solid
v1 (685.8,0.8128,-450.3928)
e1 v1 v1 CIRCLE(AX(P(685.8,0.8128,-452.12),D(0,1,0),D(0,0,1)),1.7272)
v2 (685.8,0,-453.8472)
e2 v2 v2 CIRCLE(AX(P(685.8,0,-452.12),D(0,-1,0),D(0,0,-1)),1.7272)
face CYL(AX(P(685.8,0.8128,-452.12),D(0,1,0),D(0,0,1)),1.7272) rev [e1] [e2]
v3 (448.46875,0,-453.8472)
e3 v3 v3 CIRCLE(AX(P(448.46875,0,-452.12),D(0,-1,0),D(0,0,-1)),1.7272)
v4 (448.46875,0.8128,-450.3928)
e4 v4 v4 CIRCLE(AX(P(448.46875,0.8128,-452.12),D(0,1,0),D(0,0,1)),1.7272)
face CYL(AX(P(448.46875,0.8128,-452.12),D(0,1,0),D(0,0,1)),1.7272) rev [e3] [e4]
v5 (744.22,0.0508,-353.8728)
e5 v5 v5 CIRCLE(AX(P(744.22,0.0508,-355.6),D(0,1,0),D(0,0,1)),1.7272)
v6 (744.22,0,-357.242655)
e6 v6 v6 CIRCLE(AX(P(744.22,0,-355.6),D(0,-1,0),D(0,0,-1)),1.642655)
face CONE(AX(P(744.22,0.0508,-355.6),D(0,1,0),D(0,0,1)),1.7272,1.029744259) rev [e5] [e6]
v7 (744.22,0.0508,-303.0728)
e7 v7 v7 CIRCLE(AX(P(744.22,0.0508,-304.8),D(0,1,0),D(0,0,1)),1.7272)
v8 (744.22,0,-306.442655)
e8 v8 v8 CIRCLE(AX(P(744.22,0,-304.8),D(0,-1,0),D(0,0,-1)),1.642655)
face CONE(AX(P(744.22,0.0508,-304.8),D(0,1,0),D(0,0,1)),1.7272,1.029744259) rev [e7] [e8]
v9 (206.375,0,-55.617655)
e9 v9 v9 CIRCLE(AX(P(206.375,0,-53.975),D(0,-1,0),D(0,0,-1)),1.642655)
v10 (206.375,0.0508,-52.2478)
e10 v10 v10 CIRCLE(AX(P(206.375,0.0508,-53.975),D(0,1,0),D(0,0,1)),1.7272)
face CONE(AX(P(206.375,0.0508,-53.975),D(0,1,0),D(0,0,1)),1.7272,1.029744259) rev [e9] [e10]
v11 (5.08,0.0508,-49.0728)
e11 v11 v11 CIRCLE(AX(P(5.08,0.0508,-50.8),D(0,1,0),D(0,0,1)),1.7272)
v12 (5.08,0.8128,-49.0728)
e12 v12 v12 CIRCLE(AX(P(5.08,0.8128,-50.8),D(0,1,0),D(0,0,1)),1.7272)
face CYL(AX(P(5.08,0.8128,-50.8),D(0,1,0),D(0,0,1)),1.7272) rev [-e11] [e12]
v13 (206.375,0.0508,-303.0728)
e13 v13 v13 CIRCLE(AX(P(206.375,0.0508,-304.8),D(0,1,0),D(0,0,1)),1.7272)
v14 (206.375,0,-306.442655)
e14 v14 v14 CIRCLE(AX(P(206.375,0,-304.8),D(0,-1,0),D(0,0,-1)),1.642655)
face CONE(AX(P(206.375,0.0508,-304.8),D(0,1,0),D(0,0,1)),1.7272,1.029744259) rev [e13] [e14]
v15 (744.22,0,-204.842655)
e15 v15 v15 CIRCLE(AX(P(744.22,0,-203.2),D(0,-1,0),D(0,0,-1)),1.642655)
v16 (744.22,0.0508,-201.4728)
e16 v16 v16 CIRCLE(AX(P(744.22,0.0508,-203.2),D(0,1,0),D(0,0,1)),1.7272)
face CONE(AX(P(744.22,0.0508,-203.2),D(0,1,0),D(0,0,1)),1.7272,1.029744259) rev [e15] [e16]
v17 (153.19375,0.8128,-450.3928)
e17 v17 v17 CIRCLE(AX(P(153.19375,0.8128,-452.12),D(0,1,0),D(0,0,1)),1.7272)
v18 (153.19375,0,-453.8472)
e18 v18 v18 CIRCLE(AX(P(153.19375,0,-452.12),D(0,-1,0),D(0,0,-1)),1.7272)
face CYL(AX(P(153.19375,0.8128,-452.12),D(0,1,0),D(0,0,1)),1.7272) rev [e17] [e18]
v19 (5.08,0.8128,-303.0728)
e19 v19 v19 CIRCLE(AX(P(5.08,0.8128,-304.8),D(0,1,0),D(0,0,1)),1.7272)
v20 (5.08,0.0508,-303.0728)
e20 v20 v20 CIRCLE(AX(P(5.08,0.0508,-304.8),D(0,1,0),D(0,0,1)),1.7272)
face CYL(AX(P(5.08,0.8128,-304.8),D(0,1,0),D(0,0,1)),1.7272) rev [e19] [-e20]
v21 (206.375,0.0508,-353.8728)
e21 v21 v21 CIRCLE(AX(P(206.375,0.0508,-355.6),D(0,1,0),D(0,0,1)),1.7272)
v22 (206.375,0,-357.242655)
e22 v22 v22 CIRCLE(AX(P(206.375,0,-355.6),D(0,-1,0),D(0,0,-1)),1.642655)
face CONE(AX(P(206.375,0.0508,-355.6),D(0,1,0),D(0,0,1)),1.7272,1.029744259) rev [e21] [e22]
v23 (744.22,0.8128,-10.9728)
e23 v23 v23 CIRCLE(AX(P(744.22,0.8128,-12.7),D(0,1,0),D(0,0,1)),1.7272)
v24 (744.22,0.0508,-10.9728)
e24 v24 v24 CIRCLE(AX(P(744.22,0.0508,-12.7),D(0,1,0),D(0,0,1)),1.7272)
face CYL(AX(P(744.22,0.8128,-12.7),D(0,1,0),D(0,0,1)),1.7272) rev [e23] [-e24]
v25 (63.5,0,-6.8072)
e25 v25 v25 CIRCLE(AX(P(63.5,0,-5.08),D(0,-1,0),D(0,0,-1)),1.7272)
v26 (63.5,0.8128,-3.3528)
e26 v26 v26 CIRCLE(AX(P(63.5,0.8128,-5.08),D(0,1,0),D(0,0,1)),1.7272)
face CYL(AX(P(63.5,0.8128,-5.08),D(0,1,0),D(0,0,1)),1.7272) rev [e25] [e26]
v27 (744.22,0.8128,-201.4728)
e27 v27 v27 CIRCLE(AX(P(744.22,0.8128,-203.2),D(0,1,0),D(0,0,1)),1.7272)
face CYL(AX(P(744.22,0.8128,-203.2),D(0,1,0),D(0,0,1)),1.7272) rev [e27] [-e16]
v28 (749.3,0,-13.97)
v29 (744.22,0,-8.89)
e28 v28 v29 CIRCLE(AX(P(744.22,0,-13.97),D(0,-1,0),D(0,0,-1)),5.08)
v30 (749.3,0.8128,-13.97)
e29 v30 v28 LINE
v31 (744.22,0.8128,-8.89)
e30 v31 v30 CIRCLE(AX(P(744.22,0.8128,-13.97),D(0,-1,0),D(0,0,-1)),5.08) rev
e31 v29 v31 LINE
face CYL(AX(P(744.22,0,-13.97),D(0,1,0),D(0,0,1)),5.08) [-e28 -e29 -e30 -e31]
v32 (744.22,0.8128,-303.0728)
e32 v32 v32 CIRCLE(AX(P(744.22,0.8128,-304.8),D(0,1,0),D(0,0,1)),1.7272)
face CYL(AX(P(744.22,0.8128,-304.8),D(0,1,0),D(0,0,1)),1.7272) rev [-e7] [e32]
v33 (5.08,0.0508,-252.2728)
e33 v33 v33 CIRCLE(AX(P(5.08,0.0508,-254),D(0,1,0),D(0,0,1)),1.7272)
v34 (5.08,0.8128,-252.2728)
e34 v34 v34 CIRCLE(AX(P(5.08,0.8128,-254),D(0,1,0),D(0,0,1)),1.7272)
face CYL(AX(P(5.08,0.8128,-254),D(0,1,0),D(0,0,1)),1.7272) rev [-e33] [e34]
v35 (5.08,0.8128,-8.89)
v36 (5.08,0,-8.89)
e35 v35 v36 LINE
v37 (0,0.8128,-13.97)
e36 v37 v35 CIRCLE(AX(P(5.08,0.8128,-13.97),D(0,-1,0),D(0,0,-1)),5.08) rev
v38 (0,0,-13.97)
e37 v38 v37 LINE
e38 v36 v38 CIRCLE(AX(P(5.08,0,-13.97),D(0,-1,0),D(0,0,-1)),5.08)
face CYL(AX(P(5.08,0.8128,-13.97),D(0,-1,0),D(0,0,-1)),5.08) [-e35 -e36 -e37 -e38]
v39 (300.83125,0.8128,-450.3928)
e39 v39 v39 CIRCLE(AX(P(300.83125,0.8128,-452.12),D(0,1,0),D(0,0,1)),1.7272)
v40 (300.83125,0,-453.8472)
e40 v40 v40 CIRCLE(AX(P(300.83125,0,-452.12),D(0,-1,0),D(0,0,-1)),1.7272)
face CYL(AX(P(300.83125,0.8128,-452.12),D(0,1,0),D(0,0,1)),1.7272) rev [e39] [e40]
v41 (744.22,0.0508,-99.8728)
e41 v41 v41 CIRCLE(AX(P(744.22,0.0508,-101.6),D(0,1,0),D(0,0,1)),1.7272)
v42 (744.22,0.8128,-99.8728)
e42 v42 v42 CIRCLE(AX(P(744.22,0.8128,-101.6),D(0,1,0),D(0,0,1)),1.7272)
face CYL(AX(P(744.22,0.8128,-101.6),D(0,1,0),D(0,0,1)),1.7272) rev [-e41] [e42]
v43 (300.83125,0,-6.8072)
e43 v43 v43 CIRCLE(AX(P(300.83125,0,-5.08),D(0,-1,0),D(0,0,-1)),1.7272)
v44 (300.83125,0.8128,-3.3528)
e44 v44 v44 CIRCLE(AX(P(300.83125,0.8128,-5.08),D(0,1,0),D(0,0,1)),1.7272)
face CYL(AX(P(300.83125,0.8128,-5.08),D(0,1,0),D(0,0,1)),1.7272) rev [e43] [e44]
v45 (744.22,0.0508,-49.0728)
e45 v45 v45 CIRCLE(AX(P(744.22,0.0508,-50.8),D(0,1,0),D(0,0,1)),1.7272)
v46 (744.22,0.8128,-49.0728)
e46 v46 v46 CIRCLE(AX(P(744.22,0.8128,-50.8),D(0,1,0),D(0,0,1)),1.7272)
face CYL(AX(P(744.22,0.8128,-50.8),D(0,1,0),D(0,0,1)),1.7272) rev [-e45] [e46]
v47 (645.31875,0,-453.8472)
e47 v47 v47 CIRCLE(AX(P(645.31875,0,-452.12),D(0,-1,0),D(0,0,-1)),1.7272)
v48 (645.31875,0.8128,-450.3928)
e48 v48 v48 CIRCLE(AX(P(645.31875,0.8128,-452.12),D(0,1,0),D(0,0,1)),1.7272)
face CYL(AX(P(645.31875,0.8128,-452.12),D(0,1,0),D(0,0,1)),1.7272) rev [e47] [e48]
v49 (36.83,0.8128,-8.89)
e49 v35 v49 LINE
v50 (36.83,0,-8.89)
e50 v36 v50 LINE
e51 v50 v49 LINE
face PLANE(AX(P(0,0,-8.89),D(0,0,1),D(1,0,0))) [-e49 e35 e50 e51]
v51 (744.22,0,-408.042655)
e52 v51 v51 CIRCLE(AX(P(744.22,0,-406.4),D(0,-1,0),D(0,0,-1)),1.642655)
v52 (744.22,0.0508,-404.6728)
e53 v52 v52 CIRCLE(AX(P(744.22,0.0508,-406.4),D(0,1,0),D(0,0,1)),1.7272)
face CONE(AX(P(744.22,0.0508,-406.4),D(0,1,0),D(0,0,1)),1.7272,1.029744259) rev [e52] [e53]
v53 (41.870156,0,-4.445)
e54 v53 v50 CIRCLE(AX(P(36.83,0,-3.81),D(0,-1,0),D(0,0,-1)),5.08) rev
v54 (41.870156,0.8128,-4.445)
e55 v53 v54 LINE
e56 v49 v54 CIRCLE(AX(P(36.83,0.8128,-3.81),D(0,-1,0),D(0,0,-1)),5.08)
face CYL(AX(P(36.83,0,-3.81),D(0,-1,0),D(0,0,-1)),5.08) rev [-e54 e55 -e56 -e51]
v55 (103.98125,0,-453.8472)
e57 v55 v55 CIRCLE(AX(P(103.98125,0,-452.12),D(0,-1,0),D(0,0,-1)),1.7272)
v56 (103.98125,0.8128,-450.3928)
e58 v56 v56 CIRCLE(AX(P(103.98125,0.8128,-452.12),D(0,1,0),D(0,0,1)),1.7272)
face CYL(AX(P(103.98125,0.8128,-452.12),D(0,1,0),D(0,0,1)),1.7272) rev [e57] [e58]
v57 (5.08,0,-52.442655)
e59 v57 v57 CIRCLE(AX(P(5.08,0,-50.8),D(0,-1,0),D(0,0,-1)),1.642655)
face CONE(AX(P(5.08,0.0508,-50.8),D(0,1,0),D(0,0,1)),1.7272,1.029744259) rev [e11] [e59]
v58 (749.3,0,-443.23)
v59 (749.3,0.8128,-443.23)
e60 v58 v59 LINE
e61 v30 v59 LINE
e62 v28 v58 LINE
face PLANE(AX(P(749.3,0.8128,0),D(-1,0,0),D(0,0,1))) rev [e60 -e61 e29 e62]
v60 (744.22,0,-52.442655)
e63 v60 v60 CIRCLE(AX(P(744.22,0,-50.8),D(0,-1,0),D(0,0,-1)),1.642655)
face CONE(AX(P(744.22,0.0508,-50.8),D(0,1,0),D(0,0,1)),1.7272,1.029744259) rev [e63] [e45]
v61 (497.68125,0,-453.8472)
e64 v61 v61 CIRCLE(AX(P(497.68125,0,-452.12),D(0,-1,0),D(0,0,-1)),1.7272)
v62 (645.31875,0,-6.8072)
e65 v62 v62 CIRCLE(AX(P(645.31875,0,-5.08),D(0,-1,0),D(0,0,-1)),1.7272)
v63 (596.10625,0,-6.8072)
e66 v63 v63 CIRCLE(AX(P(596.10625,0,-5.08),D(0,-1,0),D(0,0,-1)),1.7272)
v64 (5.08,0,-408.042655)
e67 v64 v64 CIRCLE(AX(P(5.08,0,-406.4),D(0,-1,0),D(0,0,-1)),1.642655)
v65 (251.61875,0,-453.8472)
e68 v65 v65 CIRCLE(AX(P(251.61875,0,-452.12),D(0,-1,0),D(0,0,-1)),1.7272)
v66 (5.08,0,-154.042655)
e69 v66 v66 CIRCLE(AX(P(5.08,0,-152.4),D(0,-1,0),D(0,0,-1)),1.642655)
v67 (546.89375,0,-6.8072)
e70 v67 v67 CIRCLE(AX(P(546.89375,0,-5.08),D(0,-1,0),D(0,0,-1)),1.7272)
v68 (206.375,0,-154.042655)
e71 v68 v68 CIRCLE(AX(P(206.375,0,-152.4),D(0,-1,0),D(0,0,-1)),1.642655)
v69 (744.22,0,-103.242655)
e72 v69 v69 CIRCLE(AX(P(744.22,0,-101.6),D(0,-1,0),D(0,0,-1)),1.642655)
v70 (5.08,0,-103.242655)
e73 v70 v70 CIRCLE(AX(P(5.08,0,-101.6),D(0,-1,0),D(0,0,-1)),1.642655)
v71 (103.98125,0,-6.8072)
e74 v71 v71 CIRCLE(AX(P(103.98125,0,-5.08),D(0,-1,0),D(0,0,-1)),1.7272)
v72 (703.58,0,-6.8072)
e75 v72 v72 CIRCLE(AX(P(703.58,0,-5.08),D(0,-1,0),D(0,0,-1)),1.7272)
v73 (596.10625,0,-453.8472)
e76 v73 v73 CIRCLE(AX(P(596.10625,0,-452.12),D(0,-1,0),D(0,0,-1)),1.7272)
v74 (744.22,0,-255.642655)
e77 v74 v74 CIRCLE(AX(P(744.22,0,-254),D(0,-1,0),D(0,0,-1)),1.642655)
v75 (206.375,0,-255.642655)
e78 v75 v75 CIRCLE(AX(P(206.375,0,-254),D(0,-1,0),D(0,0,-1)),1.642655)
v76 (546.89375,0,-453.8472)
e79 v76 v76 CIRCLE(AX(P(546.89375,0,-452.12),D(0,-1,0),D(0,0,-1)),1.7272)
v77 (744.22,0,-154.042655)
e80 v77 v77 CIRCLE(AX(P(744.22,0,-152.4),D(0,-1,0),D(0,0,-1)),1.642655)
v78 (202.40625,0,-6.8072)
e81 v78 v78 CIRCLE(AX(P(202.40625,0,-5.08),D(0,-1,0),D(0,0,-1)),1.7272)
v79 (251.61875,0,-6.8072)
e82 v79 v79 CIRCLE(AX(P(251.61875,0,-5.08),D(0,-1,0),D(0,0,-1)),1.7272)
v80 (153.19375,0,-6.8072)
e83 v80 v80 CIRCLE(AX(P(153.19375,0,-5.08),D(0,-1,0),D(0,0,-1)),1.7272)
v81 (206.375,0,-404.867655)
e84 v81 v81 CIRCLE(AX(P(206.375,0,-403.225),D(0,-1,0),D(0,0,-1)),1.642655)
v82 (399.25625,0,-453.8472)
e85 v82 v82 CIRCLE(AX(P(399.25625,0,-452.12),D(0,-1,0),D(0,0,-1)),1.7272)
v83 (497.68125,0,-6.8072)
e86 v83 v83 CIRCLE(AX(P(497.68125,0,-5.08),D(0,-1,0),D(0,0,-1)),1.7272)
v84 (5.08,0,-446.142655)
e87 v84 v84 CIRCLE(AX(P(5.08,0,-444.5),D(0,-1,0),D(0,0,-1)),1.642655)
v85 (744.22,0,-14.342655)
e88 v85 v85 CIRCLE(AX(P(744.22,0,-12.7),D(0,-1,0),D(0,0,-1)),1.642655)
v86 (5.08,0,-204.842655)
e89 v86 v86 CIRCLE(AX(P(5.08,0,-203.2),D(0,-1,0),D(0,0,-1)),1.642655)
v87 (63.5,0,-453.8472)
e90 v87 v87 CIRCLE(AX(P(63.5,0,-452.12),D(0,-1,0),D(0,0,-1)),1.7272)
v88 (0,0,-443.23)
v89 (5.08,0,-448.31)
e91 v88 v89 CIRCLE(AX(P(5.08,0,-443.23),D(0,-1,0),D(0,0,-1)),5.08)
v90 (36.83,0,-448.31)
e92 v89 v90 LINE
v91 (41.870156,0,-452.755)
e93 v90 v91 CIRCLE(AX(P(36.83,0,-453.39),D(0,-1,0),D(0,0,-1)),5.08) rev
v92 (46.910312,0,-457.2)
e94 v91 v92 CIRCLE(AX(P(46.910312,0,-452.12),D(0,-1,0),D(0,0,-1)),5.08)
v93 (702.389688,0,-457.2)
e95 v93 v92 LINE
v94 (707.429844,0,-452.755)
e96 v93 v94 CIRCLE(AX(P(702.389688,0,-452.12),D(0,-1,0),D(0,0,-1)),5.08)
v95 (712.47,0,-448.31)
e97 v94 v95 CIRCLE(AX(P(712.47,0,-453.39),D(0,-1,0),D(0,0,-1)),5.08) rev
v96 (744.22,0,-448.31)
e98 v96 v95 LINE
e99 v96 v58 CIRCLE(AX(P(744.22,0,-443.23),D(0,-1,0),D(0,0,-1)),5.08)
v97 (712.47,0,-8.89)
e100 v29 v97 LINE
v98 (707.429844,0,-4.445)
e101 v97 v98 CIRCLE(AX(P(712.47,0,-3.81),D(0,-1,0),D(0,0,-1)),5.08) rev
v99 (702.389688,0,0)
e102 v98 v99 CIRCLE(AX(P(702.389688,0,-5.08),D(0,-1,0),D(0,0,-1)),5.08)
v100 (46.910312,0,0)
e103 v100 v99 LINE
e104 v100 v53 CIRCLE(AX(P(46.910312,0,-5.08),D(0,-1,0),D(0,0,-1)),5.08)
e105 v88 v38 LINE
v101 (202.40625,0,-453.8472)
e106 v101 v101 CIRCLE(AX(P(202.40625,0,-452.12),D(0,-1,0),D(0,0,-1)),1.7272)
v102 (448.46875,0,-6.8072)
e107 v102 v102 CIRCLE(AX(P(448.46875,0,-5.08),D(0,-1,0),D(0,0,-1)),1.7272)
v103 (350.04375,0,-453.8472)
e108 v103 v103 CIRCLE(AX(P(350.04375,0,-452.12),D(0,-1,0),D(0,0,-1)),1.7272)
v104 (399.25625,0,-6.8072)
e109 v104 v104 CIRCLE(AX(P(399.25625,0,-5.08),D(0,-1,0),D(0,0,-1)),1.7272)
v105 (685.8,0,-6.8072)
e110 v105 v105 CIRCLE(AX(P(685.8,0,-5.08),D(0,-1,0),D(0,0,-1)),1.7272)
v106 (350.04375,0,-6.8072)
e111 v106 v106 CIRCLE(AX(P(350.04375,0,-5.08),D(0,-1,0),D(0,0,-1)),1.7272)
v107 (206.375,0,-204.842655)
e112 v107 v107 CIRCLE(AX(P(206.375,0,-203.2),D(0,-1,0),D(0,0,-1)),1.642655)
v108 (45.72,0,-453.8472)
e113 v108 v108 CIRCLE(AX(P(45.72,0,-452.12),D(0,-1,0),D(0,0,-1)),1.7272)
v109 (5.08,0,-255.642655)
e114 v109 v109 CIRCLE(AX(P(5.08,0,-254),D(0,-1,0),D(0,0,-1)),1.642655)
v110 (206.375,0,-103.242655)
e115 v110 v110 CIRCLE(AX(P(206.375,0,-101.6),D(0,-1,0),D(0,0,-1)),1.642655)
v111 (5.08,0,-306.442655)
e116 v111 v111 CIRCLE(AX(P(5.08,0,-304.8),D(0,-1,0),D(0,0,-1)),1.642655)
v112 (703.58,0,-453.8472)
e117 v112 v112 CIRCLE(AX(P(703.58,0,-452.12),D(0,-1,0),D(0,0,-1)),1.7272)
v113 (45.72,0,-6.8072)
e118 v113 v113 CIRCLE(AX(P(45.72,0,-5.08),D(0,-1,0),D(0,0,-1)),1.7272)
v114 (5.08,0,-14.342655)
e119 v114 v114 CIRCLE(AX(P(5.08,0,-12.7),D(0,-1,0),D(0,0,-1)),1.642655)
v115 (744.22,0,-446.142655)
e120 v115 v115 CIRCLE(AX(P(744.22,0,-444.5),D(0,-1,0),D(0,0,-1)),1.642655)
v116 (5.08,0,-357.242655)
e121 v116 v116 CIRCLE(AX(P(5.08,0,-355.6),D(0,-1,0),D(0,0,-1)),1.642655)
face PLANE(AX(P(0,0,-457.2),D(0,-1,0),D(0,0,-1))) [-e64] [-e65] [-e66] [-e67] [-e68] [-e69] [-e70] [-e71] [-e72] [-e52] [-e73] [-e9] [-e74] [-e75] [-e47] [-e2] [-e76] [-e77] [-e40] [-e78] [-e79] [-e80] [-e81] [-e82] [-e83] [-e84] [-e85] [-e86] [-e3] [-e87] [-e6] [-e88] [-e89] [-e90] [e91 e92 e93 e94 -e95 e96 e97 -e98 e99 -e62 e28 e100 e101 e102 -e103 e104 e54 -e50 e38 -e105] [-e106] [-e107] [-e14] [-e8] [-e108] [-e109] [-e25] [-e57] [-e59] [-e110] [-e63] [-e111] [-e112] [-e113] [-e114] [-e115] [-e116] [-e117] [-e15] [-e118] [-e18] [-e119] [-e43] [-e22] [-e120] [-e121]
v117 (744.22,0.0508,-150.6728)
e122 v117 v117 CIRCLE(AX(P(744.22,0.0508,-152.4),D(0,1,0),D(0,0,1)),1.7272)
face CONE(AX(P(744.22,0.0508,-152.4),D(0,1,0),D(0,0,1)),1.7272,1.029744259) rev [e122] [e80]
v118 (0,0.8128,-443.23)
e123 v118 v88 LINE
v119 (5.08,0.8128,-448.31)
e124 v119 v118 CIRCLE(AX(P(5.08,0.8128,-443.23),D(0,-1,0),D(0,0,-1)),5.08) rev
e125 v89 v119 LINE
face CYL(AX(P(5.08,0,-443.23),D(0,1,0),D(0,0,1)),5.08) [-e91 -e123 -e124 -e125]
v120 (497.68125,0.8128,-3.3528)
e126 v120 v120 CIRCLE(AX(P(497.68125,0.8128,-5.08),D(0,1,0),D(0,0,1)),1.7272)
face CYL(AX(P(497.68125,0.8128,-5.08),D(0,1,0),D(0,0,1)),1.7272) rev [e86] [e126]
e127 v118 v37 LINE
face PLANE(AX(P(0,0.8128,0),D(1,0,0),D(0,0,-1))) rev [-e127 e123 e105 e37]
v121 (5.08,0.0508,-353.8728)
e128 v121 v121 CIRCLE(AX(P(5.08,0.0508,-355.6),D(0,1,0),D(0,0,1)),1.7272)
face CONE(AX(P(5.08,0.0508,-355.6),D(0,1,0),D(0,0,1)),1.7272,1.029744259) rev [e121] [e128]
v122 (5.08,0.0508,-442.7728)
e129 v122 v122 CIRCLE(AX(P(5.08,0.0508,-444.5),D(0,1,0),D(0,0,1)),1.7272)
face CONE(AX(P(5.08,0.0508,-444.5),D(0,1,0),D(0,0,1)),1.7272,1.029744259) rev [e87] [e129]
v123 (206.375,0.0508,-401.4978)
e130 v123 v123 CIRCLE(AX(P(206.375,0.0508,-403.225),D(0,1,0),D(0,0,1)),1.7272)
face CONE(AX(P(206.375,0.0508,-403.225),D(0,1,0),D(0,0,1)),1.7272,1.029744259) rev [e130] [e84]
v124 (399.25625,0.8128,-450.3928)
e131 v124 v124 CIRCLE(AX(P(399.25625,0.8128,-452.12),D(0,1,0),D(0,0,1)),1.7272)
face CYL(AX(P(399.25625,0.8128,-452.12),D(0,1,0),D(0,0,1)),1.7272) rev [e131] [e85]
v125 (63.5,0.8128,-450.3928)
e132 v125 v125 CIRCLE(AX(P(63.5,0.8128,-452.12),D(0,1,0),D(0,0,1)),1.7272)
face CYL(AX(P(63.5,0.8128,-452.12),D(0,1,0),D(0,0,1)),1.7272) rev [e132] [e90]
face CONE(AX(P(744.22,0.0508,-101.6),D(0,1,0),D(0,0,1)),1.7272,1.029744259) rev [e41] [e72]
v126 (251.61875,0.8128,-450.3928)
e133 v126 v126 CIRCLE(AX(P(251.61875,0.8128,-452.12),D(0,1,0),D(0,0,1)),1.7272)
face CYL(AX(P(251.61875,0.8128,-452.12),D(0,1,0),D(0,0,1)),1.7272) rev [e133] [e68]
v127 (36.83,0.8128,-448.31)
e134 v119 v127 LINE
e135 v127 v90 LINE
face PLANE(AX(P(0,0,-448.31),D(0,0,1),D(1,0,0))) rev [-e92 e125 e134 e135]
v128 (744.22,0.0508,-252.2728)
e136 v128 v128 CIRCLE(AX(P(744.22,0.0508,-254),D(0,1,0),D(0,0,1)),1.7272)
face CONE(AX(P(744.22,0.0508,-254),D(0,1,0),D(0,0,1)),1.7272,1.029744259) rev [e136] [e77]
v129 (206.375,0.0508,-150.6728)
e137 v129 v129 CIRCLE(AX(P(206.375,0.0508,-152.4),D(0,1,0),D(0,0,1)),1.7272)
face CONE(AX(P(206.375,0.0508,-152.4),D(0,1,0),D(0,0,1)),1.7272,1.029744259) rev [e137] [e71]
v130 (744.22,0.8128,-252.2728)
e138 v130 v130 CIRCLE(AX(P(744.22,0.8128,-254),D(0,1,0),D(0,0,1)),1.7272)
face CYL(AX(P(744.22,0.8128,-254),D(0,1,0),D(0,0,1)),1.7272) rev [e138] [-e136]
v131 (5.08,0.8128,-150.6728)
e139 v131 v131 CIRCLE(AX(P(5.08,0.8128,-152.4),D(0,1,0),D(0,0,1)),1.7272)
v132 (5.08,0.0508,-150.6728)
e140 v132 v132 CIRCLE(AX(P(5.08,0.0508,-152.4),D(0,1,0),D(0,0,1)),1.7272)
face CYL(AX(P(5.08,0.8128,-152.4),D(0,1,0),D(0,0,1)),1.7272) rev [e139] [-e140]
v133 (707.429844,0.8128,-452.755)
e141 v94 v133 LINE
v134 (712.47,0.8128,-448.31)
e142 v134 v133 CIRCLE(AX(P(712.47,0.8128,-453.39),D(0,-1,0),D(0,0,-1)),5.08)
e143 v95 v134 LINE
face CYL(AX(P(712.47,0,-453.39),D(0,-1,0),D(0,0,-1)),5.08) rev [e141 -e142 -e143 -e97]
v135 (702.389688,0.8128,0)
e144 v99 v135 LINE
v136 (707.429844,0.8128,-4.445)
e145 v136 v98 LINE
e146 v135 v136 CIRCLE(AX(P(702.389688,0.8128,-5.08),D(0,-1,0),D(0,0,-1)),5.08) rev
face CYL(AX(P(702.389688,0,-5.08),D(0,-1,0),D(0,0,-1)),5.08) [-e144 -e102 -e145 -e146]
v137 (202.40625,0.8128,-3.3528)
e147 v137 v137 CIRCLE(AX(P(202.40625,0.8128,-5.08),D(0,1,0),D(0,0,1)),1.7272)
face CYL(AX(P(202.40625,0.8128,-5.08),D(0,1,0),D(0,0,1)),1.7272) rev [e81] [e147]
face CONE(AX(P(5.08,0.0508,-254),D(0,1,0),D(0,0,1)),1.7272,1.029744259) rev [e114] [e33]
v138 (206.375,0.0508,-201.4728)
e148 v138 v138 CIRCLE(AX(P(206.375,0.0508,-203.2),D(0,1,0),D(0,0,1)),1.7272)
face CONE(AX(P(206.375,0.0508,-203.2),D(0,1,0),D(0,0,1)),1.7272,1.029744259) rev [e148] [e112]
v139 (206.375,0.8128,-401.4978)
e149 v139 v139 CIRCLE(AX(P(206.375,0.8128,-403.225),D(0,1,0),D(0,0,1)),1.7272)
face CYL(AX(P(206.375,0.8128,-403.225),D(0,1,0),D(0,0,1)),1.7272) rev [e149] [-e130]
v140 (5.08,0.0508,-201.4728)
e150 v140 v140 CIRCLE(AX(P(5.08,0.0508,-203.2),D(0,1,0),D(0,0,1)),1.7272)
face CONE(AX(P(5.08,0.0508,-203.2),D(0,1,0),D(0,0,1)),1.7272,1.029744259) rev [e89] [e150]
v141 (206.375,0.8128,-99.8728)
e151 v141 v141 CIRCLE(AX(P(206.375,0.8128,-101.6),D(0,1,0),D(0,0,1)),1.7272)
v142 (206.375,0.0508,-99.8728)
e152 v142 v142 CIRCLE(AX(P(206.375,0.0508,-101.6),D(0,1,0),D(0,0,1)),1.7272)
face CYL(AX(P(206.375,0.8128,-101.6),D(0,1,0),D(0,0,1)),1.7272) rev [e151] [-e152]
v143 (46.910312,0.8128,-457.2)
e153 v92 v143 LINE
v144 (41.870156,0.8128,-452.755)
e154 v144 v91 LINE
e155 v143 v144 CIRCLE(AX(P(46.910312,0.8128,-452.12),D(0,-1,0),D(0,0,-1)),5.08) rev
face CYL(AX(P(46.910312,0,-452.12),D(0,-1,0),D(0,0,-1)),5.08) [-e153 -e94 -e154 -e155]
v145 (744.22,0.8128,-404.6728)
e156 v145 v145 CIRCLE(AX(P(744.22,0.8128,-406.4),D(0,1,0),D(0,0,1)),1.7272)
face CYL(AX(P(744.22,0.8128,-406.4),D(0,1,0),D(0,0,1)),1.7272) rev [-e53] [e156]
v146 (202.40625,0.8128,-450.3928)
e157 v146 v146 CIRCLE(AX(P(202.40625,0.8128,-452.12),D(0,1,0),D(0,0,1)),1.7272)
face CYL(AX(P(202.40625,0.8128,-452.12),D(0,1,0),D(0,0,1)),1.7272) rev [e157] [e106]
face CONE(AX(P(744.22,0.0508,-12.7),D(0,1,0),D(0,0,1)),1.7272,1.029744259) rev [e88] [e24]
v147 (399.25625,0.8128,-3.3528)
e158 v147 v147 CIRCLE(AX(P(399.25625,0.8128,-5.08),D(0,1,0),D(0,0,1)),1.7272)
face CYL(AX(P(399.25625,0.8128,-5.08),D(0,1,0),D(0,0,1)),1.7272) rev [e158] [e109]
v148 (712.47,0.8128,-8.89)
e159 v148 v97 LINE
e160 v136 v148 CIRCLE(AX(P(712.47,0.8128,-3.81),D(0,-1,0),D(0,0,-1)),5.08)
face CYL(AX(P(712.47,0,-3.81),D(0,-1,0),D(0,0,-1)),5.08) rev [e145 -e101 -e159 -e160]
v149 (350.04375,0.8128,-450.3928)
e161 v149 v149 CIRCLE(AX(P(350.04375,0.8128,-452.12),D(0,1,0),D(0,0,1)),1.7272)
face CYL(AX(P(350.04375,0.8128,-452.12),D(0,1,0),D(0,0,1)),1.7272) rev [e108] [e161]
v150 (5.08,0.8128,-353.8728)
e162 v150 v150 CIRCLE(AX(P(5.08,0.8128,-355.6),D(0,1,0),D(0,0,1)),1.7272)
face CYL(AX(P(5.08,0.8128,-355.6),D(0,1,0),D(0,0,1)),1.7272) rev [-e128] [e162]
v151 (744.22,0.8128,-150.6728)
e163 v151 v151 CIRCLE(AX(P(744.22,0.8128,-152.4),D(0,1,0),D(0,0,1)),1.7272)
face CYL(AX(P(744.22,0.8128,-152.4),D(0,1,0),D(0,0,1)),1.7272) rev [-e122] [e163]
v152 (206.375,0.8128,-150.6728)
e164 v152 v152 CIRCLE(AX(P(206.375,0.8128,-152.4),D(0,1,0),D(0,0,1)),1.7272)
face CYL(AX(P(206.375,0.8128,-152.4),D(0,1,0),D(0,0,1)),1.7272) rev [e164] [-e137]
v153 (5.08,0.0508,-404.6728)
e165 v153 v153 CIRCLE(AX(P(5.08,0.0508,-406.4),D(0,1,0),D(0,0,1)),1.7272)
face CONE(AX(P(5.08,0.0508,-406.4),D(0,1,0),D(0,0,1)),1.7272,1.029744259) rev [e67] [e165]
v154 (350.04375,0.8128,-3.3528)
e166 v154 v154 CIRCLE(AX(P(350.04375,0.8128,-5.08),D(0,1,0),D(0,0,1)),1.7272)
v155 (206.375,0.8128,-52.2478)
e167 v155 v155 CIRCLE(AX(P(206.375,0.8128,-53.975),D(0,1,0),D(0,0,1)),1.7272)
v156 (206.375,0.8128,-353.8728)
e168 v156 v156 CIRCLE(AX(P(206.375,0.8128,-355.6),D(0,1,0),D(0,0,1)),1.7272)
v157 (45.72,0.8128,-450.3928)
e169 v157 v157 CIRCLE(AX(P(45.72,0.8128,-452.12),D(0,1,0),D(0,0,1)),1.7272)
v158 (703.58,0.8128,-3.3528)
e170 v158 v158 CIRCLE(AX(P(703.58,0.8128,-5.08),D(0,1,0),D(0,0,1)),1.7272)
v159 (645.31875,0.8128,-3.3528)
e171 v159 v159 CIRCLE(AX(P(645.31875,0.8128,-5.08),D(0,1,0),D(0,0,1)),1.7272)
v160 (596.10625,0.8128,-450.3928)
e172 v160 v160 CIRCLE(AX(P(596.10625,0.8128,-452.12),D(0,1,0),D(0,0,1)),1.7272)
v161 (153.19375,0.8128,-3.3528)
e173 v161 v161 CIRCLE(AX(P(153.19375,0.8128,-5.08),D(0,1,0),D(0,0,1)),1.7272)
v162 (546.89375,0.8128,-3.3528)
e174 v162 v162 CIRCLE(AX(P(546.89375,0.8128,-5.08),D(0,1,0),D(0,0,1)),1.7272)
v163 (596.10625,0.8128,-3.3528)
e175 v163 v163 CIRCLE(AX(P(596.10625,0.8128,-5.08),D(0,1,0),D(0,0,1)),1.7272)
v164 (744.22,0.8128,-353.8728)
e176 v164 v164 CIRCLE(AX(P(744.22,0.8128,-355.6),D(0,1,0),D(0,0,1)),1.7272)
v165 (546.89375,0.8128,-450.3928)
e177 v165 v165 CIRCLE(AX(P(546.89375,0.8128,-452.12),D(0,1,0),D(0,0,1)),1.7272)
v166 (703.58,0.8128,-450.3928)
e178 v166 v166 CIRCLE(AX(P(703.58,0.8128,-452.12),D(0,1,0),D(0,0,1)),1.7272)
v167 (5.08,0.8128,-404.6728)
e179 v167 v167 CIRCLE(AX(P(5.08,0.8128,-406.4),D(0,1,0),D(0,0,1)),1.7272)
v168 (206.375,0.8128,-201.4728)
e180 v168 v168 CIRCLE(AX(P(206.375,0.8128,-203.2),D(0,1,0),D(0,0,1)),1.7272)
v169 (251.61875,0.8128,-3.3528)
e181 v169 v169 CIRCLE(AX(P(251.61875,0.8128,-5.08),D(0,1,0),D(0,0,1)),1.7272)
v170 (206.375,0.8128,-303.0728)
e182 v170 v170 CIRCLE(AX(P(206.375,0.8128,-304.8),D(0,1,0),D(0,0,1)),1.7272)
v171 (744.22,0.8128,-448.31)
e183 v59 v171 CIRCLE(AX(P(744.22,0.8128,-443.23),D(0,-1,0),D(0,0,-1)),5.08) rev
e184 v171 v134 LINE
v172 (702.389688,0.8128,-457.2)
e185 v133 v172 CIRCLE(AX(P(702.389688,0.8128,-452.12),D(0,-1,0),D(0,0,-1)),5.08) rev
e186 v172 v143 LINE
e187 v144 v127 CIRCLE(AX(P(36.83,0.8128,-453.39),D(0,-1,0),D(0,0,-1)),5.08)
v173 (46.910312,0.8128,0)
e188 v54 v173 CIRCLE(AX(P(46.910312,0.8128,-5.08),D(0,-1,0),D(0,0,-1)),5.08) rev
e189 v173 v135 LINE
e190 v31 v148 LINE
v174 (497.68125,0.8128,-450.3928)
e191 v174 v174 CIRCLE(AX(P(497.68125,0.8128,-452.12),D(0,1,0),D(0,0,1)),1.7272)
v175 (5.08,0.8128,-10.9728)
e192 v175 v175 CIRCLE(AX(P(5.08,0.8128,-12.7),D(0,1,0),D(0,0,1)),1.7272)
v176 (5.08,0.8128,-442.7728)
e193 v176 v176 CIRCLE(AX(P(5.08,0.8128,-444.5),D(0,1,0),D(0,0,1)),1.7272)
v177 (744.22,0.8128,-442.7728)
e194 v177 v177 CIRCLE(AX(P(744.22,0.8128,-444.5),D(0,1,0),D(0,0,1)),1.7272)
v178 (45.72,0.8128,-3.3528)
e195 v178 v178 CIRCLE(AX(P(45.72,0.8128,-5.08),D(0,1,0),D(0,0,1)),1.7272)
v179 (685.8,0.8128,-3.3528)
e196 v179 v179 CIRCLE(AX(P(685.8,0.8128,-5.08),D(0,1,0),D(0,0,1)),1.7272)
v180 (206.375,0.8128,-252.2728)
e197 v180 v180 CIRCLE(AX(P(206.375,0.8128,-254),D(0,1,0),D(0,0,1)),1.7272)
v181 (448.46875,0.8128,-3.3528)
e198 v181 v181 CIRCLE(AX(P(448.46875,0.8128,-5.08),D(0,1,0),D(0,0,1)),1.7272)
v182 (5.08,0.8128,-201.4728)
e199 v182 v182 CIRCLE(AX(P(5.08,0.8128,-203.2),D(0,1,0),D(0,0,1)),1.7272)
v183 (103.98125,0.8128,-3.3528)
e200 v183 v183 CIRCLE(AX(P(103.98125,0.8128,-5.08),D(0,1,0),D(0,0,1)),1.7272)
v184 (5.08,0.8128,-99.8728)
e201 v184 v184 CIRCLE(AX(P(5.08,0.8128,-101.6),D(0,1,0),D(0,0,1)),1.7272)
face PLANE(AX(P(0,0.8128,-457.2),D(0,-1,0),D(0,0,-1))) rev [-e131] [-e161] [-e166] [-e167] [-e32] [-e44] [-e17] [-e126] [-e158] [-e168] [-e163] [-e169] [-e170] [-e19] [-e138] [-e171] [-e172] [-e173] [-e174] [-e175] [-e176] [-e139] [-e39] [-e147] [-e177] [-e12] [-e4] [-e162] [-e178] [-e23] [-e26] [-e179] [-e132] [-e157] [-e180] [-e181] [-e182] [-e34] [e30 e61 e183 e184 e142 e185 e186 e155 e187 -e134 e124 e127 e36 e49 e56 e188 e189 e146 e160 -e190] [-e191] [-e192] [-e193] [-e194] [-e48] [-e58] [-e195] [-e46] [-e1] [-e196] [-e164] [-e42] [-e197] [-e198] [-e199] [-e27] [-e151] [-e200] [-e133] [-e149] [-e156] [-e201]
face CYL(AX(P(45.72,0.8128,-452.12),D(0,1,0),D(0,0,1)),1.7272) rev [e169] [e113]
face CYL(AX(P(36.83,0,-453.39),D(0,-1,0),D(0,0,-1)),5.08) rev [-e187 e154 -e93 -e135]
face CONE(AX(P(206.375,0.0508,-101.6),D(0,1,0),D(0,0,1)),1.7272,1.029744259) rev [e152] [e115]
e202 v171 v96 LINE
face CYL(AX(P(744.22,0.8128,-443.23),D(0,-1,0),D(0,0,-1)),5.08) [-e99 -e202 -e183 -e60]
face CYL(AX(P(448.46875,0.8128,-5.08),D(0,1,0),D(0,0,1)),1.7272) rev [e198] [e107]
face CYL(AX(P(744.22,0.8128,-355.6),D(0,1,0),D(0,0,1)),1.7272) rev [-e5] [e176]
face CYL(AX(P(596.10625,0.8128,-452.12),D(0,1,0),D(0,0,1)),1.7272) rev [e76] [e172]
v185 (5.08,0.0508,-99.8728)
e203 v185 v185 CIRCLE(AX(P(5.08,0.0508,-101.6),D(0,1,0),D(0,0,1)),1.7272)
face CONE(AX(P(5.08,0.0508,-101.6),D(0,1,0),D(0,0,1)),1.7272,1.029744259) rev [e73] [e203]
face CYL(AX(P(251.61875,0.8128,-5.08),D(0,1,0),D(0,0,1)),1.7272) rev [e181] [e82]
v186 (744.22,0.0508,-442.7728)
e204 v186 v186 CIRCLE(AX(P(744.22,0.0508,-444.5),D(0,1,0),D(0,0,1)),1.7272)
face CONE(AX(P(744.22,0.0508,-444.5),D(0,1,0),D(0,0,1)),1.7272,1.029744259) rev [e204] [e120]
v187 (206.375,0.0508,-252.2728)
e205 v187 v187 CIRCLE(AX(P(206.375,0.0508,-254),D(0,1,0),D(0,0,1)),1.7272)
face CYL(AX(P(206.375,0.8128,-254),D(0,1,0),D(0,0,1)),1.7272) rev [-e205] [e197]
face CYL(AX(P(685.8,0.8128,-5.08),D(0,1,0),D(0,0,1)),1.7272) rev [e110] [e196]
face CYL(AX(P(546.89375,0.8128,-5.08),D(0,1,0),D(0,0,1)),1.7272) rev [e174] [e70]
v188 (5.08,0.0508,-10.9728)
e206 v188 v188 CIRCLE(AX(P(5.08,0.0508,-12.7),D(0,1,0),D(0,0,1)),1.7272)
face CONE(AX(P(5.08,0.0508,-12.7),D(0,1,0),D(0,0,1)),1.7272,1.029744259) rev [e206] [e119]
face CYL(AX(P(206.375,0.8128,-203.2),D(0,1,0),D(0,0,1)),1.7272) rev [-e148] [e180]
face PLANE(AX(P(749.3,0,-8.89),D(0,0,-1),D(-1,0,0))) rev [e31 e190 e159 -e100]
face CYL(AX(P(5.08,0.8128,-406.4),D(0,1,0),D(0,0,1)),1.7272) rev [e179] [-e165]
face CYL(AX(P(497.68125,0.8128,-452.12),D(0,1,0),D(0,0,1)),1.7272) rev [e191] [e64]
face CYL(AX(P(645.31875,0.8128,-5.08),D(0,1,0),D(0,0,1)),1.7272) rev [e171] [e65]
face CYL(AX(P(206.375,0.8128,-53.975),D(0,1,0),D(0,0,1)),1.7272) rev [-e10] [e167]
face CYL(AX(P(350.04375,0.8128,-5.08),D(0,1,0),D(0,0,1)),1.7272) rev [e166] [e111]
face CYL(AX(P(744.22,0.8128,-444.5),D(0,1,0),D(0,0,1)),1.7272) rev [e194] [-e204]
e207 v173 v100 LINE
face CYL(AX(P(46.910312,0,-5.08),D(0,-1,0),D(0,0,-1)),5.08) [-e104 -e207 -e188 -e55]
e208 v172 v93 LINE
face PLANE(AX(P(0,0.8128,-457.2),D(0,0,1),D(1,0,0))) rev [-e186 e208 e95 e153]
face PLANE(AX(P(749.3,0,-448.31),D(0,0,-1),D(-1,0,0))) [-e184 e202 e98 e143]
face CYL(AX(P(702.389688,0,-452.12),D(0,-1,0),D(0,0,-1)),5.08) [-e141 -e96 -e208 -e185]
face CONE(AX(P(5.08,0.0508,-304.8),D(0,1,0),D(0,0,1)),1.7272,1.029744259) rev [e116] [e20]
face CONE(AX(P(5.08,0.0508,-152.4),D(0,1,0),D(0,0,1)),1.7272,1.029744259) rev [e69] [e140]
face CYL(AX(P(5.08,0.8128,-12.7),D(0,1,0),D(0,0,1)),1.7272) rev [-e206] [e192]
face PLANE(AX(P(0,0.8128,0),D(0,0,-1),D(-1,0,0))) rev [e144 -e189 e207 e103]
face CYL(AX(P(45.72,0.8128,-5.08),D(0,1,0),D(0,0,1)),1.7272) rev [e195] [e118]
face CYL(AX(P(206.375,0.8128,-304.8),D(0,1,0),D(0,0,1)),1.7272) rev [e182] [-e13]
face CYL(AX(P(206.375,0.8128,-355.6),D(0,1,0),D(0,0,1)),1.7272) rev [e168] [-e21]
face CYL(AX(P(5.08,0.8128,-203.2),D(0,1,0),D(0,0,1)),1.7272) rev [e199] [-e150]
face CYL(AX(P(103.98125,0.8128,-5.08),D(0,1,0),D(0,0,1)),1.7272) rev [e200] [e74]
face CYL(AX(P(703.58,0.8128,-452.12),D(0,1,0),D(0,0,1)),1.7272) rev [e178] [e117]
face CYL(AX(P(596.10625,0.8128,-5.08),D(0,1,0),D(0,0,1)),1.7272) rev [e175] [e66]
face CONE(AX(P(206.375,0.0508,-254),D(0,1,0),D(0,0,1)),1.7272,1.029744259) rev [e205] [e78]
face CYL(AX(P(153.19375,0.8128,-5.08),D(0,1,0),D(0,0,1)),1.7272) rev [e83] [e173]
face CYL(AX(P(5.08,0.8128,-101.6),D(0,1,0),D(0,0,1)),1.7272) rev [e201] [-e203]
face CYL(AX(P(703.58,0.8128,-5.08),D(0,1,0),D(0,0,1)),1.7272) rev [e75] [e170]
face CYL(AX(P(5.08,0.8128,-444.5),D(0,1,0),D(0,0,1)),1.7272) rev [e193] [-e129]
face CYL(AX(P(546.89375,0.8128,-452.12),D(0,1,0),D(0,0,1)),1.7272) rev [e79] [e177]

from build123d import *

# Parameters (mm, degrees)
SKETCH1_W                       = 749.3
SKETCH1_H                       = 457.2
BOSS_EXTRUDE1_DEPTH             = 0.8128
SKETCH2_W                       = 41.91
SKETCH2_H                       = 8.89
CUT_EXTRUDE1_DEPTH              = 878.771605057
FILLET1_R                       = 5.08
FILLET1_OF_MIRROR1_R            = 5.08
MIRROR2_DEPTH                   = 0.8128
F_4_CLEARANCE_HOLE1_D           = 3.4544
F_4_CLEARANCE_HOLE2_AT_2_COUNT  = 2
F_4_CLEARANCE_HOLE2_AT_2_PITCH  = 38.1
F_4_CLEARANCE_HOLE2_AT_3_COUNT  = 2
F_4_CLEARANCE_HOLE2_AT_3_PITCH  = 88.9
F_4_CLEARANCE_HOLE2_AT_4_COUNT  = 2
F_4_CLEARANCE_HOLE2_AT_4_PITCH  = 139.7
F_4_CLEARANCE_HOLE2_AT_5_COUNT  = 2
F_4_CLEARANCE_HOLE2_AT_5_PITCH  = 190.5
F_4_CLEARANCE_HOLE2_AT_6_COUNT  = 2
F_4_CLEARANCE_HOLE2_AT_6_PITCH  = 241.3
F_4_CLEARANCE_HOLE2_AT_7_COUNT  = 2
F_4_CLEARANCE_HOLE2_AT_7_PITCH  = 292.1
F_4_CLEARANCE_HOLE2_AT_8_COUNT  = 2
F_4_CLEARANCE_HOLE2_AT_8_PITCH  = 342.9
F_4_CLEARANCE_HOLE2_AT_9_COUNT  = 2
F_4_CLEARANCE_HOLE2_AT_9_PITCH  = 393.7
F_4_CLEARANCE_HOLE2_AT_10_COUNT = 2
F_4_CLEARANCE_HOLE2_AT_10_PITCH = 431.8
F_4_CLEARANCE_HOLE3_D           = 3.4544
F_4_CLEARANCE_HOLE3_DEPTH       = 0.762
F_4_CLEARANCE_HOLE3_TIP         = 1.037806461
FILLET2_R                       = 5.08


# Read off the part's stored shape, not the designer's step: Mirror2
with BuildPart() as part:
    # Sketch1 → Boss-Extrude1 (new body)
    with BuildSketch(Plane(origin=(0, 0, 0), x_dir=(1, 0, 0), z_dir=(0, 1, 0))):
        with Locations((374.65, 228.6)):
            Rectangle(SKETCH1_W, SKETCH1_H)
    extrude(amount=BOSS_EXTRUDE1_DEPTH)

    # Sketch2 → Cut-Extrude1 (cut, through all)
    with BuildSketch(Plane(origin=(0, 0.8128, 0), x_dir=(1, 0, 0), z_dir=(0, 1, 0))):
        with Locations((20.955, 452.755)):
            Rectangle(SKETCH2_W, SKETCH2_H)
    cut_extrude1 = extrude(amount=-CUT_EXTRUDE1_DEPTH, mode=Mode.SUBTRACT)

    # Fillet1
    fillet1_edges = [part.edges().sort_by_distance(p)[0] for p in [
        (41.91, 0.4064, -448.31),
    ]]
    fillet(fillet1_edges, radius=FILLET1_R)

    # Mirror1: Cut-Extrude1 across plane
    add(cut_extrude1.mirror(Plane.ZY.offset(-374.65)), mode=Mode.SUBTRACT)

    # Fillet1 of Mirror1
    fillet1_of_mirror1_edges = [part.edges().sort_by_distance(p)[0] for p in [
        (707.39, 0.4064, -448.31),
    ]]
    fillet(fillet1_of_mirror1_edges, radius=FILLET1_OF_MIRROR1_R)

    # Mirror2 outline → Mirror2 (cut)
    with BuildSketch(Plane(origin=(0, 0, 0), x_dir=(1, 0, 0), z_dir=(0, 1, 0))):
        with BuildLine():
            Line((707.39, 3.81), (707.39, 0))
            Line((707.39, 0), (749.3, 0))
            Line((749.3, 0), (749.3, 8.89))
            Line((749.3, 8.89), (712.47, 8.89))
            ThreePointArc((712.47, 8.89), (708.877897552, 7.402102448), (707.39, 3.81))
        make_face()
        with BuildLine():
            Line((41.91, 0), (41.91, 3.81))
            ThreePointArc((41.91, 3.81), (40.422102448, 7.402102448), (36.83, 8.89))
            Line((36.83, 8.89), (0, 8.89))
            Line((0, 8.89), (0, 0))
            Line((0, 0), (41.91, 0))
        make_face()
    extrude(amount=MIRROR2_DEPTH, mode=Mode.SUBTRACT)

    # #4 Clearance Hole1 (through all)
    with Locations(Plane(origin=(0, 0.8128, 0), x_dir=(-1, 0, 0), z_dir=(0, 1, 0))):
        with Locations((-45.72, -452.12), (-63.5, -452.12), (-103.98125, -452.12), (-153.19375, -452.12), (-202.40625, -452.12), (-251.61875, -452.12), (-300.83125, -452.12), (-350.04375, -452.12), (-399.25625, -452.12), (-448.46875, -452.12), (-497.68125, -452.12), (-546.89375, -452.12), (-596.10625, -452.12), (-645.31875, -452.12), (-685.8, -452.12), (-703.58, -452.12)):
            f_4_clearance_hole1 = Hole(F_4_CLEARANCE_HOLE1_D / 2)

    # Mirror3: #4 Clearance Hole1 across plane
    add(f_4_clearance_hole1.mirror(Plane(origin=(0, 0, -228.6), x_dir=(1, 0, 0), z_dir=(0, 0, -1))), mode=Mode.SUBTRACT)

    # Sketch6 → #4 Clearance Hole2 (revolve, cut)
    with BuildSketch(Plane(origin=(744.22, 0.8128, -12.7), x_dir=(0, 0, 1), z_dir=(1, 0, 0))):
        Polygon((0, 0), (0, 1.799806461), (1.7272, 0.762), (1.7272, 0), align=None)
    f_4_clearance_hole2 = revolve(axis=Axis((744.22, 7.1628, -12.7), (0, -1, 0)), mode=Mode.SUBTRACT)

    # #4 Clearance Hole2 at 2: #4 Clearance Hole2 ×2
    with Locations(*[(0, 0, -i * F_4_CLEARANCE_HOLE2_AT_2_PITCH) for i in range(1, F_4_CLEARANCE_HOLE2_AT_2_COUNT)]):
        add(f_4_clearance_hole2, mode=Mode.SUBTRACT)

    # #4 Clearance Hole2 at 3: #4 Clearance Hole2 ×2
    with Locations(*[(0, 0, -i * F_4_CLEARANCE_HOLE2_AT_3_PITCH) for i in range(1, F_4_CLEARANCE_HOLE2_AT_3_COUNT)]):
        add(f_4_clearance_hole2, mode=Mode.SUBTRACT)

    # #4 Clearance Hole2 at 4: #4 Clearance Hole2 ×2
    with Locations(*[(0, 0, -i * F_4_CLEARANCE_HOLE2_AT_4_PITCH) for i in range(1, F_4_CLEARANCE_HOLE2_AT_4_COUNT)]):
        add(f_4_clearance_hole2, mode=Mode.SUBTRACT)

    # #4 Clearance Hole2 at 5: #4 Clearance Hole2 ×2
    with Locations(*[(0, 0, -i * F_4_CLEARANCE_HOLE2_AT_5_PITCH) for i in range(1, F_4_CLEARANCE_HOLE2_AT_5_COUNT)]):
        add(f_4_clearance_hole2, mode=Mode.SUBTRACT)

    # #4 Clearance Hole2 at 6: #4 Clearance Hole2 ×2
    with Locations(*[(0, 0, -i * F_4_CLEARANCE_HOLE2_AT_6_PITCH) for i in range(1, F_4_CLEARANCE_HOLE2_AT_6_COUNT)]):
        add(f_4_clearance_hole2, mode=Mode.SUBTRACT)

    # #4 Clearance Hole2 at 7: #4 Clearance Hole2 ×2
    with Locations(*[(0, 0, -i * F_4_CLEARANCE_HOLE2_AT_7_PITCH) for i in range(1, F_4_CLEARANCE_HOLE2_AT_7_COUNT)]):
        add(f_4_clearance_hole2, mode=Mode.SUBTRACT)

    # #4 Clearance Hole2 at 8: #4 Clearance Hole2 ×2
    with Locations(*[(0, 0, -i * F_4_CLEARANCE_HOLE2_AT_8_PITCH) for i in range(1, F_4_CLEARANCE_HOLE2_AT_8_COUNT)]):
        add(f_4_clearance_hole2, mode=Mode.SUBTRACT)

    # #4 Clearance Hole2 at 9: #4 Clearance Hole2 ×2
    with Locations(*[(0, 0, -i * F_4_CLEARANCE_HOLE2_AT_9_PITCH) for i in range(1, F_4_CLEARANCE_HOLE2_AT_9_COUNT)]):
        add(f_4_clearance_hole2, mode=Mode.SUBTRACT)

    # #4 Clearance Hole2 at 10: #4 Clearance Hole2 ×2
    with Locations(*[(0, 0, -i * F_4_CLEARANCE_HOLE2_AT_10_PITCH) for i in range(1, F_4_CLEARANCE_HOLE2_AT_10_COUNT)]):
        add(f_4_clearance_hole2, mode=Mode.SUBTRACT)

    # Mirror4: #4 Clearance Hole2 across plane
    add(f_4_clearance_hole2.mirror(Plane.ZY.offset(-374.65)), mode=Mode.SUBTRACT)

    # Mirror4 copy 1 sketch → Mirror4 copy 1 (revolve, cut)
    with BuildSketch(Plane(origin=(5.08, 0.8128, -50.8), x_dir=(0, 0, 1), z_dir=(-1, 0, 0))):
        Polygon((0, 0), (0, -1.799806461), (1.7272, -0.762), (1.7272, 0), align=None)
    revolve(axis=Axis((5.08, 7.1628, -50.8), (0, 1, 0)), mode=Mode.SUBTRACT)

    # Mirror4 copy 2 sketch → Mirror4 copy 2 (revolve, cut)
    with BuildSketch(Plane(origin=(5.08, 0.8128, -101.6), x_dir=(0, 0, 1), z_dir=(-1, 0, 0))):
        Polygon((0, 0), (0, -1.799806461), (1.7272, -0.762), (1.7272, 0), align=None)
    revolve(axis=Axis((5.08, 7.1628, -101.6), (0, 1, 0)), mode=Mode.SUBTRACT)

    # Mirror4 copy 3 sketch → Mirror4 copy 3 (revolve, cut)
    with BuildSketch(Plane(origin=(5.08, 0.8128, -152.4), x_dir=(0, 0, 1), z_dir=(-1, 0, 0))):
        Polygon((0, 0), (0, -1.799806461), (1.7272, -0.762), (1.7272, 0), align=None)
    revolve(axis=Axis((5.08, 7.1628, -152.4), (0, 1, 0)), mode=Mode.SUBTRACT)

    # Mirror4 copy 4 sketch → Mirror4 copy 4 (revolve, cut)
    with BuildSketch(Plane(origin=(5.08, 0.8128, -203.2), x_dir=(0, 0, 1), z_dir=(-1, 0, 0))):
        Polygon((0, 0), (0, -1.799806461), (1.7272, -0.762), (1.7272, 0), align=None)
    revolve(axis=Axis((5.08, 7.1628, -203.2), (0, 1, 0)), mode=Mode.SUBTRACT)

    # Mirror4 copy 5 sketch → Mirror4 copy 5 (revolve, cut)
    with BuildSketch(Plane(origin=(5.08, 0.8128, -254), x_dir=(0, 0, 1), z_dir=(-1, 0, 0))):
        Polygon((0, 0), (0, -1.799806461), (1.7272, -0.762), (1.7272, 0), align=None)
    revolve(axis=Axis((5.08, 7.1628, -254), (0, 1, 0)), mode=Mode.SUBTRACT)

    # Mirror4 copy 6 sketch → Mirror4 copy 6 (revolve, cut)
    with BuildSketch(Plane(origin=(5.08, 0.8128, -304.8), x_dir=(0, 0, 1), z_dir=(-1, 0, 0))):
        Polygon((0, 0), (0, -1.799806461), (1.7272, -0.762), (1.7272, 0), align=None)
    revolve(axis=Axis((5.08, 7.1628, -304.8), (0, 1, 0)), mode=Mode.SUBTRACT)

    # Mirror4 copy 7 sketch → Mirror4 copy 7 (revolve, cut)
    with BuildSketch(Plane(origin=(5.08, 0.8128, -355.6), x_dir=(0, 0, 1), z_dir=(-1, 0, 0))):
        Polygon((0, 0), (0, -1.799806461), (1.7272, -0.762), (1.7272, 0), align=None)
    revolve(axis=Axis((5.08, 7.1628, -355.6), (0, 1, 0)), mode=Mode.SUBTRACT)

    # Mirror4 copy 8 sketch → Mirror4 copy 8 (revolve, cut)
    with BuildSketch(Plane(origin=(5.08, 0.8128, -406.4), x_dir=(0, 0, 1), z_dir=(-1, 0, 0))):
        Polygon((0, 0), (0, -1.799806461), (1.7272, -0.762), (1.7272, 0), align=None)
    revolve(axis=Axis((5.08, 7.1628, -406.4), (0, 1, 0)), mode=Mode.SUBTRACT)

    # Mirror4 copy 9 sketch → Mirror4 copy 9 (revolve, cut)
    with BuildSketch(Plane(origin=(5.08, 0.8128, -444.5), x_dir=(0, 0, 1), z_dir=(-1, 0, 0))):
        Polygon((0, 0), (0, -1.799806461), (1.7272, -0.762), (1.7272, 0), align=None)
    revolve(axis=Axis((5.08, 7.1628, -444.5), (0, 1, 0)), mode=Mode.SUBTRACT)

    # #4 Clearance Hole3
    with Locations(Plane(origin=(0, 0.8128, 0), x_dir=(-1, 0, 0), z_dir=(0, 1, 0))):
        with Locations((-206.375, -53.975), (-206.375, -101.6), (-206.375, -152.4), (-206.375, -203.2), (-206.375, -254), (-206.375, -304.8), (-206.375, -355.6), (-206.375, -403.225)):
            Hole(F_4_CLEARANCE_HOLE3_D / 2, depth=F_4_CLEARANCE_HOLE3_DEPTH)
            with Locations((0, 0, -(F_4_CLEARANCE_HOLE3_DEPTH + F_4_CLEARANCE_HOLE3_TIP / 2))):  # 118° drill point
                Cone(0, F_4_CLEARANCE_HOLE3_D / 2, F_4_CLEARANCE_HOLE3_TIP, mode=Mode.SUBTRACT)

    # Fillet2
    fillet2_edges = [part.edges().sort_by_distance(p)[0] for p in [
        (707.39, 0.4064, -457.2),
        (749.3, 0.4064, -448.31),
        (749.3, 0.4064, -8.89),
        (707.39, 0.4064, 0),
        (41.91, 0.4064, 0),
        (0, 0.4064, -8.89),
        (0, 0.4064, -448.31),
        (41.91, 0.4064, -457.2),
    ]]
    fillet(fillet2_edges, radius=FILLET2_R)


solid = part.part
